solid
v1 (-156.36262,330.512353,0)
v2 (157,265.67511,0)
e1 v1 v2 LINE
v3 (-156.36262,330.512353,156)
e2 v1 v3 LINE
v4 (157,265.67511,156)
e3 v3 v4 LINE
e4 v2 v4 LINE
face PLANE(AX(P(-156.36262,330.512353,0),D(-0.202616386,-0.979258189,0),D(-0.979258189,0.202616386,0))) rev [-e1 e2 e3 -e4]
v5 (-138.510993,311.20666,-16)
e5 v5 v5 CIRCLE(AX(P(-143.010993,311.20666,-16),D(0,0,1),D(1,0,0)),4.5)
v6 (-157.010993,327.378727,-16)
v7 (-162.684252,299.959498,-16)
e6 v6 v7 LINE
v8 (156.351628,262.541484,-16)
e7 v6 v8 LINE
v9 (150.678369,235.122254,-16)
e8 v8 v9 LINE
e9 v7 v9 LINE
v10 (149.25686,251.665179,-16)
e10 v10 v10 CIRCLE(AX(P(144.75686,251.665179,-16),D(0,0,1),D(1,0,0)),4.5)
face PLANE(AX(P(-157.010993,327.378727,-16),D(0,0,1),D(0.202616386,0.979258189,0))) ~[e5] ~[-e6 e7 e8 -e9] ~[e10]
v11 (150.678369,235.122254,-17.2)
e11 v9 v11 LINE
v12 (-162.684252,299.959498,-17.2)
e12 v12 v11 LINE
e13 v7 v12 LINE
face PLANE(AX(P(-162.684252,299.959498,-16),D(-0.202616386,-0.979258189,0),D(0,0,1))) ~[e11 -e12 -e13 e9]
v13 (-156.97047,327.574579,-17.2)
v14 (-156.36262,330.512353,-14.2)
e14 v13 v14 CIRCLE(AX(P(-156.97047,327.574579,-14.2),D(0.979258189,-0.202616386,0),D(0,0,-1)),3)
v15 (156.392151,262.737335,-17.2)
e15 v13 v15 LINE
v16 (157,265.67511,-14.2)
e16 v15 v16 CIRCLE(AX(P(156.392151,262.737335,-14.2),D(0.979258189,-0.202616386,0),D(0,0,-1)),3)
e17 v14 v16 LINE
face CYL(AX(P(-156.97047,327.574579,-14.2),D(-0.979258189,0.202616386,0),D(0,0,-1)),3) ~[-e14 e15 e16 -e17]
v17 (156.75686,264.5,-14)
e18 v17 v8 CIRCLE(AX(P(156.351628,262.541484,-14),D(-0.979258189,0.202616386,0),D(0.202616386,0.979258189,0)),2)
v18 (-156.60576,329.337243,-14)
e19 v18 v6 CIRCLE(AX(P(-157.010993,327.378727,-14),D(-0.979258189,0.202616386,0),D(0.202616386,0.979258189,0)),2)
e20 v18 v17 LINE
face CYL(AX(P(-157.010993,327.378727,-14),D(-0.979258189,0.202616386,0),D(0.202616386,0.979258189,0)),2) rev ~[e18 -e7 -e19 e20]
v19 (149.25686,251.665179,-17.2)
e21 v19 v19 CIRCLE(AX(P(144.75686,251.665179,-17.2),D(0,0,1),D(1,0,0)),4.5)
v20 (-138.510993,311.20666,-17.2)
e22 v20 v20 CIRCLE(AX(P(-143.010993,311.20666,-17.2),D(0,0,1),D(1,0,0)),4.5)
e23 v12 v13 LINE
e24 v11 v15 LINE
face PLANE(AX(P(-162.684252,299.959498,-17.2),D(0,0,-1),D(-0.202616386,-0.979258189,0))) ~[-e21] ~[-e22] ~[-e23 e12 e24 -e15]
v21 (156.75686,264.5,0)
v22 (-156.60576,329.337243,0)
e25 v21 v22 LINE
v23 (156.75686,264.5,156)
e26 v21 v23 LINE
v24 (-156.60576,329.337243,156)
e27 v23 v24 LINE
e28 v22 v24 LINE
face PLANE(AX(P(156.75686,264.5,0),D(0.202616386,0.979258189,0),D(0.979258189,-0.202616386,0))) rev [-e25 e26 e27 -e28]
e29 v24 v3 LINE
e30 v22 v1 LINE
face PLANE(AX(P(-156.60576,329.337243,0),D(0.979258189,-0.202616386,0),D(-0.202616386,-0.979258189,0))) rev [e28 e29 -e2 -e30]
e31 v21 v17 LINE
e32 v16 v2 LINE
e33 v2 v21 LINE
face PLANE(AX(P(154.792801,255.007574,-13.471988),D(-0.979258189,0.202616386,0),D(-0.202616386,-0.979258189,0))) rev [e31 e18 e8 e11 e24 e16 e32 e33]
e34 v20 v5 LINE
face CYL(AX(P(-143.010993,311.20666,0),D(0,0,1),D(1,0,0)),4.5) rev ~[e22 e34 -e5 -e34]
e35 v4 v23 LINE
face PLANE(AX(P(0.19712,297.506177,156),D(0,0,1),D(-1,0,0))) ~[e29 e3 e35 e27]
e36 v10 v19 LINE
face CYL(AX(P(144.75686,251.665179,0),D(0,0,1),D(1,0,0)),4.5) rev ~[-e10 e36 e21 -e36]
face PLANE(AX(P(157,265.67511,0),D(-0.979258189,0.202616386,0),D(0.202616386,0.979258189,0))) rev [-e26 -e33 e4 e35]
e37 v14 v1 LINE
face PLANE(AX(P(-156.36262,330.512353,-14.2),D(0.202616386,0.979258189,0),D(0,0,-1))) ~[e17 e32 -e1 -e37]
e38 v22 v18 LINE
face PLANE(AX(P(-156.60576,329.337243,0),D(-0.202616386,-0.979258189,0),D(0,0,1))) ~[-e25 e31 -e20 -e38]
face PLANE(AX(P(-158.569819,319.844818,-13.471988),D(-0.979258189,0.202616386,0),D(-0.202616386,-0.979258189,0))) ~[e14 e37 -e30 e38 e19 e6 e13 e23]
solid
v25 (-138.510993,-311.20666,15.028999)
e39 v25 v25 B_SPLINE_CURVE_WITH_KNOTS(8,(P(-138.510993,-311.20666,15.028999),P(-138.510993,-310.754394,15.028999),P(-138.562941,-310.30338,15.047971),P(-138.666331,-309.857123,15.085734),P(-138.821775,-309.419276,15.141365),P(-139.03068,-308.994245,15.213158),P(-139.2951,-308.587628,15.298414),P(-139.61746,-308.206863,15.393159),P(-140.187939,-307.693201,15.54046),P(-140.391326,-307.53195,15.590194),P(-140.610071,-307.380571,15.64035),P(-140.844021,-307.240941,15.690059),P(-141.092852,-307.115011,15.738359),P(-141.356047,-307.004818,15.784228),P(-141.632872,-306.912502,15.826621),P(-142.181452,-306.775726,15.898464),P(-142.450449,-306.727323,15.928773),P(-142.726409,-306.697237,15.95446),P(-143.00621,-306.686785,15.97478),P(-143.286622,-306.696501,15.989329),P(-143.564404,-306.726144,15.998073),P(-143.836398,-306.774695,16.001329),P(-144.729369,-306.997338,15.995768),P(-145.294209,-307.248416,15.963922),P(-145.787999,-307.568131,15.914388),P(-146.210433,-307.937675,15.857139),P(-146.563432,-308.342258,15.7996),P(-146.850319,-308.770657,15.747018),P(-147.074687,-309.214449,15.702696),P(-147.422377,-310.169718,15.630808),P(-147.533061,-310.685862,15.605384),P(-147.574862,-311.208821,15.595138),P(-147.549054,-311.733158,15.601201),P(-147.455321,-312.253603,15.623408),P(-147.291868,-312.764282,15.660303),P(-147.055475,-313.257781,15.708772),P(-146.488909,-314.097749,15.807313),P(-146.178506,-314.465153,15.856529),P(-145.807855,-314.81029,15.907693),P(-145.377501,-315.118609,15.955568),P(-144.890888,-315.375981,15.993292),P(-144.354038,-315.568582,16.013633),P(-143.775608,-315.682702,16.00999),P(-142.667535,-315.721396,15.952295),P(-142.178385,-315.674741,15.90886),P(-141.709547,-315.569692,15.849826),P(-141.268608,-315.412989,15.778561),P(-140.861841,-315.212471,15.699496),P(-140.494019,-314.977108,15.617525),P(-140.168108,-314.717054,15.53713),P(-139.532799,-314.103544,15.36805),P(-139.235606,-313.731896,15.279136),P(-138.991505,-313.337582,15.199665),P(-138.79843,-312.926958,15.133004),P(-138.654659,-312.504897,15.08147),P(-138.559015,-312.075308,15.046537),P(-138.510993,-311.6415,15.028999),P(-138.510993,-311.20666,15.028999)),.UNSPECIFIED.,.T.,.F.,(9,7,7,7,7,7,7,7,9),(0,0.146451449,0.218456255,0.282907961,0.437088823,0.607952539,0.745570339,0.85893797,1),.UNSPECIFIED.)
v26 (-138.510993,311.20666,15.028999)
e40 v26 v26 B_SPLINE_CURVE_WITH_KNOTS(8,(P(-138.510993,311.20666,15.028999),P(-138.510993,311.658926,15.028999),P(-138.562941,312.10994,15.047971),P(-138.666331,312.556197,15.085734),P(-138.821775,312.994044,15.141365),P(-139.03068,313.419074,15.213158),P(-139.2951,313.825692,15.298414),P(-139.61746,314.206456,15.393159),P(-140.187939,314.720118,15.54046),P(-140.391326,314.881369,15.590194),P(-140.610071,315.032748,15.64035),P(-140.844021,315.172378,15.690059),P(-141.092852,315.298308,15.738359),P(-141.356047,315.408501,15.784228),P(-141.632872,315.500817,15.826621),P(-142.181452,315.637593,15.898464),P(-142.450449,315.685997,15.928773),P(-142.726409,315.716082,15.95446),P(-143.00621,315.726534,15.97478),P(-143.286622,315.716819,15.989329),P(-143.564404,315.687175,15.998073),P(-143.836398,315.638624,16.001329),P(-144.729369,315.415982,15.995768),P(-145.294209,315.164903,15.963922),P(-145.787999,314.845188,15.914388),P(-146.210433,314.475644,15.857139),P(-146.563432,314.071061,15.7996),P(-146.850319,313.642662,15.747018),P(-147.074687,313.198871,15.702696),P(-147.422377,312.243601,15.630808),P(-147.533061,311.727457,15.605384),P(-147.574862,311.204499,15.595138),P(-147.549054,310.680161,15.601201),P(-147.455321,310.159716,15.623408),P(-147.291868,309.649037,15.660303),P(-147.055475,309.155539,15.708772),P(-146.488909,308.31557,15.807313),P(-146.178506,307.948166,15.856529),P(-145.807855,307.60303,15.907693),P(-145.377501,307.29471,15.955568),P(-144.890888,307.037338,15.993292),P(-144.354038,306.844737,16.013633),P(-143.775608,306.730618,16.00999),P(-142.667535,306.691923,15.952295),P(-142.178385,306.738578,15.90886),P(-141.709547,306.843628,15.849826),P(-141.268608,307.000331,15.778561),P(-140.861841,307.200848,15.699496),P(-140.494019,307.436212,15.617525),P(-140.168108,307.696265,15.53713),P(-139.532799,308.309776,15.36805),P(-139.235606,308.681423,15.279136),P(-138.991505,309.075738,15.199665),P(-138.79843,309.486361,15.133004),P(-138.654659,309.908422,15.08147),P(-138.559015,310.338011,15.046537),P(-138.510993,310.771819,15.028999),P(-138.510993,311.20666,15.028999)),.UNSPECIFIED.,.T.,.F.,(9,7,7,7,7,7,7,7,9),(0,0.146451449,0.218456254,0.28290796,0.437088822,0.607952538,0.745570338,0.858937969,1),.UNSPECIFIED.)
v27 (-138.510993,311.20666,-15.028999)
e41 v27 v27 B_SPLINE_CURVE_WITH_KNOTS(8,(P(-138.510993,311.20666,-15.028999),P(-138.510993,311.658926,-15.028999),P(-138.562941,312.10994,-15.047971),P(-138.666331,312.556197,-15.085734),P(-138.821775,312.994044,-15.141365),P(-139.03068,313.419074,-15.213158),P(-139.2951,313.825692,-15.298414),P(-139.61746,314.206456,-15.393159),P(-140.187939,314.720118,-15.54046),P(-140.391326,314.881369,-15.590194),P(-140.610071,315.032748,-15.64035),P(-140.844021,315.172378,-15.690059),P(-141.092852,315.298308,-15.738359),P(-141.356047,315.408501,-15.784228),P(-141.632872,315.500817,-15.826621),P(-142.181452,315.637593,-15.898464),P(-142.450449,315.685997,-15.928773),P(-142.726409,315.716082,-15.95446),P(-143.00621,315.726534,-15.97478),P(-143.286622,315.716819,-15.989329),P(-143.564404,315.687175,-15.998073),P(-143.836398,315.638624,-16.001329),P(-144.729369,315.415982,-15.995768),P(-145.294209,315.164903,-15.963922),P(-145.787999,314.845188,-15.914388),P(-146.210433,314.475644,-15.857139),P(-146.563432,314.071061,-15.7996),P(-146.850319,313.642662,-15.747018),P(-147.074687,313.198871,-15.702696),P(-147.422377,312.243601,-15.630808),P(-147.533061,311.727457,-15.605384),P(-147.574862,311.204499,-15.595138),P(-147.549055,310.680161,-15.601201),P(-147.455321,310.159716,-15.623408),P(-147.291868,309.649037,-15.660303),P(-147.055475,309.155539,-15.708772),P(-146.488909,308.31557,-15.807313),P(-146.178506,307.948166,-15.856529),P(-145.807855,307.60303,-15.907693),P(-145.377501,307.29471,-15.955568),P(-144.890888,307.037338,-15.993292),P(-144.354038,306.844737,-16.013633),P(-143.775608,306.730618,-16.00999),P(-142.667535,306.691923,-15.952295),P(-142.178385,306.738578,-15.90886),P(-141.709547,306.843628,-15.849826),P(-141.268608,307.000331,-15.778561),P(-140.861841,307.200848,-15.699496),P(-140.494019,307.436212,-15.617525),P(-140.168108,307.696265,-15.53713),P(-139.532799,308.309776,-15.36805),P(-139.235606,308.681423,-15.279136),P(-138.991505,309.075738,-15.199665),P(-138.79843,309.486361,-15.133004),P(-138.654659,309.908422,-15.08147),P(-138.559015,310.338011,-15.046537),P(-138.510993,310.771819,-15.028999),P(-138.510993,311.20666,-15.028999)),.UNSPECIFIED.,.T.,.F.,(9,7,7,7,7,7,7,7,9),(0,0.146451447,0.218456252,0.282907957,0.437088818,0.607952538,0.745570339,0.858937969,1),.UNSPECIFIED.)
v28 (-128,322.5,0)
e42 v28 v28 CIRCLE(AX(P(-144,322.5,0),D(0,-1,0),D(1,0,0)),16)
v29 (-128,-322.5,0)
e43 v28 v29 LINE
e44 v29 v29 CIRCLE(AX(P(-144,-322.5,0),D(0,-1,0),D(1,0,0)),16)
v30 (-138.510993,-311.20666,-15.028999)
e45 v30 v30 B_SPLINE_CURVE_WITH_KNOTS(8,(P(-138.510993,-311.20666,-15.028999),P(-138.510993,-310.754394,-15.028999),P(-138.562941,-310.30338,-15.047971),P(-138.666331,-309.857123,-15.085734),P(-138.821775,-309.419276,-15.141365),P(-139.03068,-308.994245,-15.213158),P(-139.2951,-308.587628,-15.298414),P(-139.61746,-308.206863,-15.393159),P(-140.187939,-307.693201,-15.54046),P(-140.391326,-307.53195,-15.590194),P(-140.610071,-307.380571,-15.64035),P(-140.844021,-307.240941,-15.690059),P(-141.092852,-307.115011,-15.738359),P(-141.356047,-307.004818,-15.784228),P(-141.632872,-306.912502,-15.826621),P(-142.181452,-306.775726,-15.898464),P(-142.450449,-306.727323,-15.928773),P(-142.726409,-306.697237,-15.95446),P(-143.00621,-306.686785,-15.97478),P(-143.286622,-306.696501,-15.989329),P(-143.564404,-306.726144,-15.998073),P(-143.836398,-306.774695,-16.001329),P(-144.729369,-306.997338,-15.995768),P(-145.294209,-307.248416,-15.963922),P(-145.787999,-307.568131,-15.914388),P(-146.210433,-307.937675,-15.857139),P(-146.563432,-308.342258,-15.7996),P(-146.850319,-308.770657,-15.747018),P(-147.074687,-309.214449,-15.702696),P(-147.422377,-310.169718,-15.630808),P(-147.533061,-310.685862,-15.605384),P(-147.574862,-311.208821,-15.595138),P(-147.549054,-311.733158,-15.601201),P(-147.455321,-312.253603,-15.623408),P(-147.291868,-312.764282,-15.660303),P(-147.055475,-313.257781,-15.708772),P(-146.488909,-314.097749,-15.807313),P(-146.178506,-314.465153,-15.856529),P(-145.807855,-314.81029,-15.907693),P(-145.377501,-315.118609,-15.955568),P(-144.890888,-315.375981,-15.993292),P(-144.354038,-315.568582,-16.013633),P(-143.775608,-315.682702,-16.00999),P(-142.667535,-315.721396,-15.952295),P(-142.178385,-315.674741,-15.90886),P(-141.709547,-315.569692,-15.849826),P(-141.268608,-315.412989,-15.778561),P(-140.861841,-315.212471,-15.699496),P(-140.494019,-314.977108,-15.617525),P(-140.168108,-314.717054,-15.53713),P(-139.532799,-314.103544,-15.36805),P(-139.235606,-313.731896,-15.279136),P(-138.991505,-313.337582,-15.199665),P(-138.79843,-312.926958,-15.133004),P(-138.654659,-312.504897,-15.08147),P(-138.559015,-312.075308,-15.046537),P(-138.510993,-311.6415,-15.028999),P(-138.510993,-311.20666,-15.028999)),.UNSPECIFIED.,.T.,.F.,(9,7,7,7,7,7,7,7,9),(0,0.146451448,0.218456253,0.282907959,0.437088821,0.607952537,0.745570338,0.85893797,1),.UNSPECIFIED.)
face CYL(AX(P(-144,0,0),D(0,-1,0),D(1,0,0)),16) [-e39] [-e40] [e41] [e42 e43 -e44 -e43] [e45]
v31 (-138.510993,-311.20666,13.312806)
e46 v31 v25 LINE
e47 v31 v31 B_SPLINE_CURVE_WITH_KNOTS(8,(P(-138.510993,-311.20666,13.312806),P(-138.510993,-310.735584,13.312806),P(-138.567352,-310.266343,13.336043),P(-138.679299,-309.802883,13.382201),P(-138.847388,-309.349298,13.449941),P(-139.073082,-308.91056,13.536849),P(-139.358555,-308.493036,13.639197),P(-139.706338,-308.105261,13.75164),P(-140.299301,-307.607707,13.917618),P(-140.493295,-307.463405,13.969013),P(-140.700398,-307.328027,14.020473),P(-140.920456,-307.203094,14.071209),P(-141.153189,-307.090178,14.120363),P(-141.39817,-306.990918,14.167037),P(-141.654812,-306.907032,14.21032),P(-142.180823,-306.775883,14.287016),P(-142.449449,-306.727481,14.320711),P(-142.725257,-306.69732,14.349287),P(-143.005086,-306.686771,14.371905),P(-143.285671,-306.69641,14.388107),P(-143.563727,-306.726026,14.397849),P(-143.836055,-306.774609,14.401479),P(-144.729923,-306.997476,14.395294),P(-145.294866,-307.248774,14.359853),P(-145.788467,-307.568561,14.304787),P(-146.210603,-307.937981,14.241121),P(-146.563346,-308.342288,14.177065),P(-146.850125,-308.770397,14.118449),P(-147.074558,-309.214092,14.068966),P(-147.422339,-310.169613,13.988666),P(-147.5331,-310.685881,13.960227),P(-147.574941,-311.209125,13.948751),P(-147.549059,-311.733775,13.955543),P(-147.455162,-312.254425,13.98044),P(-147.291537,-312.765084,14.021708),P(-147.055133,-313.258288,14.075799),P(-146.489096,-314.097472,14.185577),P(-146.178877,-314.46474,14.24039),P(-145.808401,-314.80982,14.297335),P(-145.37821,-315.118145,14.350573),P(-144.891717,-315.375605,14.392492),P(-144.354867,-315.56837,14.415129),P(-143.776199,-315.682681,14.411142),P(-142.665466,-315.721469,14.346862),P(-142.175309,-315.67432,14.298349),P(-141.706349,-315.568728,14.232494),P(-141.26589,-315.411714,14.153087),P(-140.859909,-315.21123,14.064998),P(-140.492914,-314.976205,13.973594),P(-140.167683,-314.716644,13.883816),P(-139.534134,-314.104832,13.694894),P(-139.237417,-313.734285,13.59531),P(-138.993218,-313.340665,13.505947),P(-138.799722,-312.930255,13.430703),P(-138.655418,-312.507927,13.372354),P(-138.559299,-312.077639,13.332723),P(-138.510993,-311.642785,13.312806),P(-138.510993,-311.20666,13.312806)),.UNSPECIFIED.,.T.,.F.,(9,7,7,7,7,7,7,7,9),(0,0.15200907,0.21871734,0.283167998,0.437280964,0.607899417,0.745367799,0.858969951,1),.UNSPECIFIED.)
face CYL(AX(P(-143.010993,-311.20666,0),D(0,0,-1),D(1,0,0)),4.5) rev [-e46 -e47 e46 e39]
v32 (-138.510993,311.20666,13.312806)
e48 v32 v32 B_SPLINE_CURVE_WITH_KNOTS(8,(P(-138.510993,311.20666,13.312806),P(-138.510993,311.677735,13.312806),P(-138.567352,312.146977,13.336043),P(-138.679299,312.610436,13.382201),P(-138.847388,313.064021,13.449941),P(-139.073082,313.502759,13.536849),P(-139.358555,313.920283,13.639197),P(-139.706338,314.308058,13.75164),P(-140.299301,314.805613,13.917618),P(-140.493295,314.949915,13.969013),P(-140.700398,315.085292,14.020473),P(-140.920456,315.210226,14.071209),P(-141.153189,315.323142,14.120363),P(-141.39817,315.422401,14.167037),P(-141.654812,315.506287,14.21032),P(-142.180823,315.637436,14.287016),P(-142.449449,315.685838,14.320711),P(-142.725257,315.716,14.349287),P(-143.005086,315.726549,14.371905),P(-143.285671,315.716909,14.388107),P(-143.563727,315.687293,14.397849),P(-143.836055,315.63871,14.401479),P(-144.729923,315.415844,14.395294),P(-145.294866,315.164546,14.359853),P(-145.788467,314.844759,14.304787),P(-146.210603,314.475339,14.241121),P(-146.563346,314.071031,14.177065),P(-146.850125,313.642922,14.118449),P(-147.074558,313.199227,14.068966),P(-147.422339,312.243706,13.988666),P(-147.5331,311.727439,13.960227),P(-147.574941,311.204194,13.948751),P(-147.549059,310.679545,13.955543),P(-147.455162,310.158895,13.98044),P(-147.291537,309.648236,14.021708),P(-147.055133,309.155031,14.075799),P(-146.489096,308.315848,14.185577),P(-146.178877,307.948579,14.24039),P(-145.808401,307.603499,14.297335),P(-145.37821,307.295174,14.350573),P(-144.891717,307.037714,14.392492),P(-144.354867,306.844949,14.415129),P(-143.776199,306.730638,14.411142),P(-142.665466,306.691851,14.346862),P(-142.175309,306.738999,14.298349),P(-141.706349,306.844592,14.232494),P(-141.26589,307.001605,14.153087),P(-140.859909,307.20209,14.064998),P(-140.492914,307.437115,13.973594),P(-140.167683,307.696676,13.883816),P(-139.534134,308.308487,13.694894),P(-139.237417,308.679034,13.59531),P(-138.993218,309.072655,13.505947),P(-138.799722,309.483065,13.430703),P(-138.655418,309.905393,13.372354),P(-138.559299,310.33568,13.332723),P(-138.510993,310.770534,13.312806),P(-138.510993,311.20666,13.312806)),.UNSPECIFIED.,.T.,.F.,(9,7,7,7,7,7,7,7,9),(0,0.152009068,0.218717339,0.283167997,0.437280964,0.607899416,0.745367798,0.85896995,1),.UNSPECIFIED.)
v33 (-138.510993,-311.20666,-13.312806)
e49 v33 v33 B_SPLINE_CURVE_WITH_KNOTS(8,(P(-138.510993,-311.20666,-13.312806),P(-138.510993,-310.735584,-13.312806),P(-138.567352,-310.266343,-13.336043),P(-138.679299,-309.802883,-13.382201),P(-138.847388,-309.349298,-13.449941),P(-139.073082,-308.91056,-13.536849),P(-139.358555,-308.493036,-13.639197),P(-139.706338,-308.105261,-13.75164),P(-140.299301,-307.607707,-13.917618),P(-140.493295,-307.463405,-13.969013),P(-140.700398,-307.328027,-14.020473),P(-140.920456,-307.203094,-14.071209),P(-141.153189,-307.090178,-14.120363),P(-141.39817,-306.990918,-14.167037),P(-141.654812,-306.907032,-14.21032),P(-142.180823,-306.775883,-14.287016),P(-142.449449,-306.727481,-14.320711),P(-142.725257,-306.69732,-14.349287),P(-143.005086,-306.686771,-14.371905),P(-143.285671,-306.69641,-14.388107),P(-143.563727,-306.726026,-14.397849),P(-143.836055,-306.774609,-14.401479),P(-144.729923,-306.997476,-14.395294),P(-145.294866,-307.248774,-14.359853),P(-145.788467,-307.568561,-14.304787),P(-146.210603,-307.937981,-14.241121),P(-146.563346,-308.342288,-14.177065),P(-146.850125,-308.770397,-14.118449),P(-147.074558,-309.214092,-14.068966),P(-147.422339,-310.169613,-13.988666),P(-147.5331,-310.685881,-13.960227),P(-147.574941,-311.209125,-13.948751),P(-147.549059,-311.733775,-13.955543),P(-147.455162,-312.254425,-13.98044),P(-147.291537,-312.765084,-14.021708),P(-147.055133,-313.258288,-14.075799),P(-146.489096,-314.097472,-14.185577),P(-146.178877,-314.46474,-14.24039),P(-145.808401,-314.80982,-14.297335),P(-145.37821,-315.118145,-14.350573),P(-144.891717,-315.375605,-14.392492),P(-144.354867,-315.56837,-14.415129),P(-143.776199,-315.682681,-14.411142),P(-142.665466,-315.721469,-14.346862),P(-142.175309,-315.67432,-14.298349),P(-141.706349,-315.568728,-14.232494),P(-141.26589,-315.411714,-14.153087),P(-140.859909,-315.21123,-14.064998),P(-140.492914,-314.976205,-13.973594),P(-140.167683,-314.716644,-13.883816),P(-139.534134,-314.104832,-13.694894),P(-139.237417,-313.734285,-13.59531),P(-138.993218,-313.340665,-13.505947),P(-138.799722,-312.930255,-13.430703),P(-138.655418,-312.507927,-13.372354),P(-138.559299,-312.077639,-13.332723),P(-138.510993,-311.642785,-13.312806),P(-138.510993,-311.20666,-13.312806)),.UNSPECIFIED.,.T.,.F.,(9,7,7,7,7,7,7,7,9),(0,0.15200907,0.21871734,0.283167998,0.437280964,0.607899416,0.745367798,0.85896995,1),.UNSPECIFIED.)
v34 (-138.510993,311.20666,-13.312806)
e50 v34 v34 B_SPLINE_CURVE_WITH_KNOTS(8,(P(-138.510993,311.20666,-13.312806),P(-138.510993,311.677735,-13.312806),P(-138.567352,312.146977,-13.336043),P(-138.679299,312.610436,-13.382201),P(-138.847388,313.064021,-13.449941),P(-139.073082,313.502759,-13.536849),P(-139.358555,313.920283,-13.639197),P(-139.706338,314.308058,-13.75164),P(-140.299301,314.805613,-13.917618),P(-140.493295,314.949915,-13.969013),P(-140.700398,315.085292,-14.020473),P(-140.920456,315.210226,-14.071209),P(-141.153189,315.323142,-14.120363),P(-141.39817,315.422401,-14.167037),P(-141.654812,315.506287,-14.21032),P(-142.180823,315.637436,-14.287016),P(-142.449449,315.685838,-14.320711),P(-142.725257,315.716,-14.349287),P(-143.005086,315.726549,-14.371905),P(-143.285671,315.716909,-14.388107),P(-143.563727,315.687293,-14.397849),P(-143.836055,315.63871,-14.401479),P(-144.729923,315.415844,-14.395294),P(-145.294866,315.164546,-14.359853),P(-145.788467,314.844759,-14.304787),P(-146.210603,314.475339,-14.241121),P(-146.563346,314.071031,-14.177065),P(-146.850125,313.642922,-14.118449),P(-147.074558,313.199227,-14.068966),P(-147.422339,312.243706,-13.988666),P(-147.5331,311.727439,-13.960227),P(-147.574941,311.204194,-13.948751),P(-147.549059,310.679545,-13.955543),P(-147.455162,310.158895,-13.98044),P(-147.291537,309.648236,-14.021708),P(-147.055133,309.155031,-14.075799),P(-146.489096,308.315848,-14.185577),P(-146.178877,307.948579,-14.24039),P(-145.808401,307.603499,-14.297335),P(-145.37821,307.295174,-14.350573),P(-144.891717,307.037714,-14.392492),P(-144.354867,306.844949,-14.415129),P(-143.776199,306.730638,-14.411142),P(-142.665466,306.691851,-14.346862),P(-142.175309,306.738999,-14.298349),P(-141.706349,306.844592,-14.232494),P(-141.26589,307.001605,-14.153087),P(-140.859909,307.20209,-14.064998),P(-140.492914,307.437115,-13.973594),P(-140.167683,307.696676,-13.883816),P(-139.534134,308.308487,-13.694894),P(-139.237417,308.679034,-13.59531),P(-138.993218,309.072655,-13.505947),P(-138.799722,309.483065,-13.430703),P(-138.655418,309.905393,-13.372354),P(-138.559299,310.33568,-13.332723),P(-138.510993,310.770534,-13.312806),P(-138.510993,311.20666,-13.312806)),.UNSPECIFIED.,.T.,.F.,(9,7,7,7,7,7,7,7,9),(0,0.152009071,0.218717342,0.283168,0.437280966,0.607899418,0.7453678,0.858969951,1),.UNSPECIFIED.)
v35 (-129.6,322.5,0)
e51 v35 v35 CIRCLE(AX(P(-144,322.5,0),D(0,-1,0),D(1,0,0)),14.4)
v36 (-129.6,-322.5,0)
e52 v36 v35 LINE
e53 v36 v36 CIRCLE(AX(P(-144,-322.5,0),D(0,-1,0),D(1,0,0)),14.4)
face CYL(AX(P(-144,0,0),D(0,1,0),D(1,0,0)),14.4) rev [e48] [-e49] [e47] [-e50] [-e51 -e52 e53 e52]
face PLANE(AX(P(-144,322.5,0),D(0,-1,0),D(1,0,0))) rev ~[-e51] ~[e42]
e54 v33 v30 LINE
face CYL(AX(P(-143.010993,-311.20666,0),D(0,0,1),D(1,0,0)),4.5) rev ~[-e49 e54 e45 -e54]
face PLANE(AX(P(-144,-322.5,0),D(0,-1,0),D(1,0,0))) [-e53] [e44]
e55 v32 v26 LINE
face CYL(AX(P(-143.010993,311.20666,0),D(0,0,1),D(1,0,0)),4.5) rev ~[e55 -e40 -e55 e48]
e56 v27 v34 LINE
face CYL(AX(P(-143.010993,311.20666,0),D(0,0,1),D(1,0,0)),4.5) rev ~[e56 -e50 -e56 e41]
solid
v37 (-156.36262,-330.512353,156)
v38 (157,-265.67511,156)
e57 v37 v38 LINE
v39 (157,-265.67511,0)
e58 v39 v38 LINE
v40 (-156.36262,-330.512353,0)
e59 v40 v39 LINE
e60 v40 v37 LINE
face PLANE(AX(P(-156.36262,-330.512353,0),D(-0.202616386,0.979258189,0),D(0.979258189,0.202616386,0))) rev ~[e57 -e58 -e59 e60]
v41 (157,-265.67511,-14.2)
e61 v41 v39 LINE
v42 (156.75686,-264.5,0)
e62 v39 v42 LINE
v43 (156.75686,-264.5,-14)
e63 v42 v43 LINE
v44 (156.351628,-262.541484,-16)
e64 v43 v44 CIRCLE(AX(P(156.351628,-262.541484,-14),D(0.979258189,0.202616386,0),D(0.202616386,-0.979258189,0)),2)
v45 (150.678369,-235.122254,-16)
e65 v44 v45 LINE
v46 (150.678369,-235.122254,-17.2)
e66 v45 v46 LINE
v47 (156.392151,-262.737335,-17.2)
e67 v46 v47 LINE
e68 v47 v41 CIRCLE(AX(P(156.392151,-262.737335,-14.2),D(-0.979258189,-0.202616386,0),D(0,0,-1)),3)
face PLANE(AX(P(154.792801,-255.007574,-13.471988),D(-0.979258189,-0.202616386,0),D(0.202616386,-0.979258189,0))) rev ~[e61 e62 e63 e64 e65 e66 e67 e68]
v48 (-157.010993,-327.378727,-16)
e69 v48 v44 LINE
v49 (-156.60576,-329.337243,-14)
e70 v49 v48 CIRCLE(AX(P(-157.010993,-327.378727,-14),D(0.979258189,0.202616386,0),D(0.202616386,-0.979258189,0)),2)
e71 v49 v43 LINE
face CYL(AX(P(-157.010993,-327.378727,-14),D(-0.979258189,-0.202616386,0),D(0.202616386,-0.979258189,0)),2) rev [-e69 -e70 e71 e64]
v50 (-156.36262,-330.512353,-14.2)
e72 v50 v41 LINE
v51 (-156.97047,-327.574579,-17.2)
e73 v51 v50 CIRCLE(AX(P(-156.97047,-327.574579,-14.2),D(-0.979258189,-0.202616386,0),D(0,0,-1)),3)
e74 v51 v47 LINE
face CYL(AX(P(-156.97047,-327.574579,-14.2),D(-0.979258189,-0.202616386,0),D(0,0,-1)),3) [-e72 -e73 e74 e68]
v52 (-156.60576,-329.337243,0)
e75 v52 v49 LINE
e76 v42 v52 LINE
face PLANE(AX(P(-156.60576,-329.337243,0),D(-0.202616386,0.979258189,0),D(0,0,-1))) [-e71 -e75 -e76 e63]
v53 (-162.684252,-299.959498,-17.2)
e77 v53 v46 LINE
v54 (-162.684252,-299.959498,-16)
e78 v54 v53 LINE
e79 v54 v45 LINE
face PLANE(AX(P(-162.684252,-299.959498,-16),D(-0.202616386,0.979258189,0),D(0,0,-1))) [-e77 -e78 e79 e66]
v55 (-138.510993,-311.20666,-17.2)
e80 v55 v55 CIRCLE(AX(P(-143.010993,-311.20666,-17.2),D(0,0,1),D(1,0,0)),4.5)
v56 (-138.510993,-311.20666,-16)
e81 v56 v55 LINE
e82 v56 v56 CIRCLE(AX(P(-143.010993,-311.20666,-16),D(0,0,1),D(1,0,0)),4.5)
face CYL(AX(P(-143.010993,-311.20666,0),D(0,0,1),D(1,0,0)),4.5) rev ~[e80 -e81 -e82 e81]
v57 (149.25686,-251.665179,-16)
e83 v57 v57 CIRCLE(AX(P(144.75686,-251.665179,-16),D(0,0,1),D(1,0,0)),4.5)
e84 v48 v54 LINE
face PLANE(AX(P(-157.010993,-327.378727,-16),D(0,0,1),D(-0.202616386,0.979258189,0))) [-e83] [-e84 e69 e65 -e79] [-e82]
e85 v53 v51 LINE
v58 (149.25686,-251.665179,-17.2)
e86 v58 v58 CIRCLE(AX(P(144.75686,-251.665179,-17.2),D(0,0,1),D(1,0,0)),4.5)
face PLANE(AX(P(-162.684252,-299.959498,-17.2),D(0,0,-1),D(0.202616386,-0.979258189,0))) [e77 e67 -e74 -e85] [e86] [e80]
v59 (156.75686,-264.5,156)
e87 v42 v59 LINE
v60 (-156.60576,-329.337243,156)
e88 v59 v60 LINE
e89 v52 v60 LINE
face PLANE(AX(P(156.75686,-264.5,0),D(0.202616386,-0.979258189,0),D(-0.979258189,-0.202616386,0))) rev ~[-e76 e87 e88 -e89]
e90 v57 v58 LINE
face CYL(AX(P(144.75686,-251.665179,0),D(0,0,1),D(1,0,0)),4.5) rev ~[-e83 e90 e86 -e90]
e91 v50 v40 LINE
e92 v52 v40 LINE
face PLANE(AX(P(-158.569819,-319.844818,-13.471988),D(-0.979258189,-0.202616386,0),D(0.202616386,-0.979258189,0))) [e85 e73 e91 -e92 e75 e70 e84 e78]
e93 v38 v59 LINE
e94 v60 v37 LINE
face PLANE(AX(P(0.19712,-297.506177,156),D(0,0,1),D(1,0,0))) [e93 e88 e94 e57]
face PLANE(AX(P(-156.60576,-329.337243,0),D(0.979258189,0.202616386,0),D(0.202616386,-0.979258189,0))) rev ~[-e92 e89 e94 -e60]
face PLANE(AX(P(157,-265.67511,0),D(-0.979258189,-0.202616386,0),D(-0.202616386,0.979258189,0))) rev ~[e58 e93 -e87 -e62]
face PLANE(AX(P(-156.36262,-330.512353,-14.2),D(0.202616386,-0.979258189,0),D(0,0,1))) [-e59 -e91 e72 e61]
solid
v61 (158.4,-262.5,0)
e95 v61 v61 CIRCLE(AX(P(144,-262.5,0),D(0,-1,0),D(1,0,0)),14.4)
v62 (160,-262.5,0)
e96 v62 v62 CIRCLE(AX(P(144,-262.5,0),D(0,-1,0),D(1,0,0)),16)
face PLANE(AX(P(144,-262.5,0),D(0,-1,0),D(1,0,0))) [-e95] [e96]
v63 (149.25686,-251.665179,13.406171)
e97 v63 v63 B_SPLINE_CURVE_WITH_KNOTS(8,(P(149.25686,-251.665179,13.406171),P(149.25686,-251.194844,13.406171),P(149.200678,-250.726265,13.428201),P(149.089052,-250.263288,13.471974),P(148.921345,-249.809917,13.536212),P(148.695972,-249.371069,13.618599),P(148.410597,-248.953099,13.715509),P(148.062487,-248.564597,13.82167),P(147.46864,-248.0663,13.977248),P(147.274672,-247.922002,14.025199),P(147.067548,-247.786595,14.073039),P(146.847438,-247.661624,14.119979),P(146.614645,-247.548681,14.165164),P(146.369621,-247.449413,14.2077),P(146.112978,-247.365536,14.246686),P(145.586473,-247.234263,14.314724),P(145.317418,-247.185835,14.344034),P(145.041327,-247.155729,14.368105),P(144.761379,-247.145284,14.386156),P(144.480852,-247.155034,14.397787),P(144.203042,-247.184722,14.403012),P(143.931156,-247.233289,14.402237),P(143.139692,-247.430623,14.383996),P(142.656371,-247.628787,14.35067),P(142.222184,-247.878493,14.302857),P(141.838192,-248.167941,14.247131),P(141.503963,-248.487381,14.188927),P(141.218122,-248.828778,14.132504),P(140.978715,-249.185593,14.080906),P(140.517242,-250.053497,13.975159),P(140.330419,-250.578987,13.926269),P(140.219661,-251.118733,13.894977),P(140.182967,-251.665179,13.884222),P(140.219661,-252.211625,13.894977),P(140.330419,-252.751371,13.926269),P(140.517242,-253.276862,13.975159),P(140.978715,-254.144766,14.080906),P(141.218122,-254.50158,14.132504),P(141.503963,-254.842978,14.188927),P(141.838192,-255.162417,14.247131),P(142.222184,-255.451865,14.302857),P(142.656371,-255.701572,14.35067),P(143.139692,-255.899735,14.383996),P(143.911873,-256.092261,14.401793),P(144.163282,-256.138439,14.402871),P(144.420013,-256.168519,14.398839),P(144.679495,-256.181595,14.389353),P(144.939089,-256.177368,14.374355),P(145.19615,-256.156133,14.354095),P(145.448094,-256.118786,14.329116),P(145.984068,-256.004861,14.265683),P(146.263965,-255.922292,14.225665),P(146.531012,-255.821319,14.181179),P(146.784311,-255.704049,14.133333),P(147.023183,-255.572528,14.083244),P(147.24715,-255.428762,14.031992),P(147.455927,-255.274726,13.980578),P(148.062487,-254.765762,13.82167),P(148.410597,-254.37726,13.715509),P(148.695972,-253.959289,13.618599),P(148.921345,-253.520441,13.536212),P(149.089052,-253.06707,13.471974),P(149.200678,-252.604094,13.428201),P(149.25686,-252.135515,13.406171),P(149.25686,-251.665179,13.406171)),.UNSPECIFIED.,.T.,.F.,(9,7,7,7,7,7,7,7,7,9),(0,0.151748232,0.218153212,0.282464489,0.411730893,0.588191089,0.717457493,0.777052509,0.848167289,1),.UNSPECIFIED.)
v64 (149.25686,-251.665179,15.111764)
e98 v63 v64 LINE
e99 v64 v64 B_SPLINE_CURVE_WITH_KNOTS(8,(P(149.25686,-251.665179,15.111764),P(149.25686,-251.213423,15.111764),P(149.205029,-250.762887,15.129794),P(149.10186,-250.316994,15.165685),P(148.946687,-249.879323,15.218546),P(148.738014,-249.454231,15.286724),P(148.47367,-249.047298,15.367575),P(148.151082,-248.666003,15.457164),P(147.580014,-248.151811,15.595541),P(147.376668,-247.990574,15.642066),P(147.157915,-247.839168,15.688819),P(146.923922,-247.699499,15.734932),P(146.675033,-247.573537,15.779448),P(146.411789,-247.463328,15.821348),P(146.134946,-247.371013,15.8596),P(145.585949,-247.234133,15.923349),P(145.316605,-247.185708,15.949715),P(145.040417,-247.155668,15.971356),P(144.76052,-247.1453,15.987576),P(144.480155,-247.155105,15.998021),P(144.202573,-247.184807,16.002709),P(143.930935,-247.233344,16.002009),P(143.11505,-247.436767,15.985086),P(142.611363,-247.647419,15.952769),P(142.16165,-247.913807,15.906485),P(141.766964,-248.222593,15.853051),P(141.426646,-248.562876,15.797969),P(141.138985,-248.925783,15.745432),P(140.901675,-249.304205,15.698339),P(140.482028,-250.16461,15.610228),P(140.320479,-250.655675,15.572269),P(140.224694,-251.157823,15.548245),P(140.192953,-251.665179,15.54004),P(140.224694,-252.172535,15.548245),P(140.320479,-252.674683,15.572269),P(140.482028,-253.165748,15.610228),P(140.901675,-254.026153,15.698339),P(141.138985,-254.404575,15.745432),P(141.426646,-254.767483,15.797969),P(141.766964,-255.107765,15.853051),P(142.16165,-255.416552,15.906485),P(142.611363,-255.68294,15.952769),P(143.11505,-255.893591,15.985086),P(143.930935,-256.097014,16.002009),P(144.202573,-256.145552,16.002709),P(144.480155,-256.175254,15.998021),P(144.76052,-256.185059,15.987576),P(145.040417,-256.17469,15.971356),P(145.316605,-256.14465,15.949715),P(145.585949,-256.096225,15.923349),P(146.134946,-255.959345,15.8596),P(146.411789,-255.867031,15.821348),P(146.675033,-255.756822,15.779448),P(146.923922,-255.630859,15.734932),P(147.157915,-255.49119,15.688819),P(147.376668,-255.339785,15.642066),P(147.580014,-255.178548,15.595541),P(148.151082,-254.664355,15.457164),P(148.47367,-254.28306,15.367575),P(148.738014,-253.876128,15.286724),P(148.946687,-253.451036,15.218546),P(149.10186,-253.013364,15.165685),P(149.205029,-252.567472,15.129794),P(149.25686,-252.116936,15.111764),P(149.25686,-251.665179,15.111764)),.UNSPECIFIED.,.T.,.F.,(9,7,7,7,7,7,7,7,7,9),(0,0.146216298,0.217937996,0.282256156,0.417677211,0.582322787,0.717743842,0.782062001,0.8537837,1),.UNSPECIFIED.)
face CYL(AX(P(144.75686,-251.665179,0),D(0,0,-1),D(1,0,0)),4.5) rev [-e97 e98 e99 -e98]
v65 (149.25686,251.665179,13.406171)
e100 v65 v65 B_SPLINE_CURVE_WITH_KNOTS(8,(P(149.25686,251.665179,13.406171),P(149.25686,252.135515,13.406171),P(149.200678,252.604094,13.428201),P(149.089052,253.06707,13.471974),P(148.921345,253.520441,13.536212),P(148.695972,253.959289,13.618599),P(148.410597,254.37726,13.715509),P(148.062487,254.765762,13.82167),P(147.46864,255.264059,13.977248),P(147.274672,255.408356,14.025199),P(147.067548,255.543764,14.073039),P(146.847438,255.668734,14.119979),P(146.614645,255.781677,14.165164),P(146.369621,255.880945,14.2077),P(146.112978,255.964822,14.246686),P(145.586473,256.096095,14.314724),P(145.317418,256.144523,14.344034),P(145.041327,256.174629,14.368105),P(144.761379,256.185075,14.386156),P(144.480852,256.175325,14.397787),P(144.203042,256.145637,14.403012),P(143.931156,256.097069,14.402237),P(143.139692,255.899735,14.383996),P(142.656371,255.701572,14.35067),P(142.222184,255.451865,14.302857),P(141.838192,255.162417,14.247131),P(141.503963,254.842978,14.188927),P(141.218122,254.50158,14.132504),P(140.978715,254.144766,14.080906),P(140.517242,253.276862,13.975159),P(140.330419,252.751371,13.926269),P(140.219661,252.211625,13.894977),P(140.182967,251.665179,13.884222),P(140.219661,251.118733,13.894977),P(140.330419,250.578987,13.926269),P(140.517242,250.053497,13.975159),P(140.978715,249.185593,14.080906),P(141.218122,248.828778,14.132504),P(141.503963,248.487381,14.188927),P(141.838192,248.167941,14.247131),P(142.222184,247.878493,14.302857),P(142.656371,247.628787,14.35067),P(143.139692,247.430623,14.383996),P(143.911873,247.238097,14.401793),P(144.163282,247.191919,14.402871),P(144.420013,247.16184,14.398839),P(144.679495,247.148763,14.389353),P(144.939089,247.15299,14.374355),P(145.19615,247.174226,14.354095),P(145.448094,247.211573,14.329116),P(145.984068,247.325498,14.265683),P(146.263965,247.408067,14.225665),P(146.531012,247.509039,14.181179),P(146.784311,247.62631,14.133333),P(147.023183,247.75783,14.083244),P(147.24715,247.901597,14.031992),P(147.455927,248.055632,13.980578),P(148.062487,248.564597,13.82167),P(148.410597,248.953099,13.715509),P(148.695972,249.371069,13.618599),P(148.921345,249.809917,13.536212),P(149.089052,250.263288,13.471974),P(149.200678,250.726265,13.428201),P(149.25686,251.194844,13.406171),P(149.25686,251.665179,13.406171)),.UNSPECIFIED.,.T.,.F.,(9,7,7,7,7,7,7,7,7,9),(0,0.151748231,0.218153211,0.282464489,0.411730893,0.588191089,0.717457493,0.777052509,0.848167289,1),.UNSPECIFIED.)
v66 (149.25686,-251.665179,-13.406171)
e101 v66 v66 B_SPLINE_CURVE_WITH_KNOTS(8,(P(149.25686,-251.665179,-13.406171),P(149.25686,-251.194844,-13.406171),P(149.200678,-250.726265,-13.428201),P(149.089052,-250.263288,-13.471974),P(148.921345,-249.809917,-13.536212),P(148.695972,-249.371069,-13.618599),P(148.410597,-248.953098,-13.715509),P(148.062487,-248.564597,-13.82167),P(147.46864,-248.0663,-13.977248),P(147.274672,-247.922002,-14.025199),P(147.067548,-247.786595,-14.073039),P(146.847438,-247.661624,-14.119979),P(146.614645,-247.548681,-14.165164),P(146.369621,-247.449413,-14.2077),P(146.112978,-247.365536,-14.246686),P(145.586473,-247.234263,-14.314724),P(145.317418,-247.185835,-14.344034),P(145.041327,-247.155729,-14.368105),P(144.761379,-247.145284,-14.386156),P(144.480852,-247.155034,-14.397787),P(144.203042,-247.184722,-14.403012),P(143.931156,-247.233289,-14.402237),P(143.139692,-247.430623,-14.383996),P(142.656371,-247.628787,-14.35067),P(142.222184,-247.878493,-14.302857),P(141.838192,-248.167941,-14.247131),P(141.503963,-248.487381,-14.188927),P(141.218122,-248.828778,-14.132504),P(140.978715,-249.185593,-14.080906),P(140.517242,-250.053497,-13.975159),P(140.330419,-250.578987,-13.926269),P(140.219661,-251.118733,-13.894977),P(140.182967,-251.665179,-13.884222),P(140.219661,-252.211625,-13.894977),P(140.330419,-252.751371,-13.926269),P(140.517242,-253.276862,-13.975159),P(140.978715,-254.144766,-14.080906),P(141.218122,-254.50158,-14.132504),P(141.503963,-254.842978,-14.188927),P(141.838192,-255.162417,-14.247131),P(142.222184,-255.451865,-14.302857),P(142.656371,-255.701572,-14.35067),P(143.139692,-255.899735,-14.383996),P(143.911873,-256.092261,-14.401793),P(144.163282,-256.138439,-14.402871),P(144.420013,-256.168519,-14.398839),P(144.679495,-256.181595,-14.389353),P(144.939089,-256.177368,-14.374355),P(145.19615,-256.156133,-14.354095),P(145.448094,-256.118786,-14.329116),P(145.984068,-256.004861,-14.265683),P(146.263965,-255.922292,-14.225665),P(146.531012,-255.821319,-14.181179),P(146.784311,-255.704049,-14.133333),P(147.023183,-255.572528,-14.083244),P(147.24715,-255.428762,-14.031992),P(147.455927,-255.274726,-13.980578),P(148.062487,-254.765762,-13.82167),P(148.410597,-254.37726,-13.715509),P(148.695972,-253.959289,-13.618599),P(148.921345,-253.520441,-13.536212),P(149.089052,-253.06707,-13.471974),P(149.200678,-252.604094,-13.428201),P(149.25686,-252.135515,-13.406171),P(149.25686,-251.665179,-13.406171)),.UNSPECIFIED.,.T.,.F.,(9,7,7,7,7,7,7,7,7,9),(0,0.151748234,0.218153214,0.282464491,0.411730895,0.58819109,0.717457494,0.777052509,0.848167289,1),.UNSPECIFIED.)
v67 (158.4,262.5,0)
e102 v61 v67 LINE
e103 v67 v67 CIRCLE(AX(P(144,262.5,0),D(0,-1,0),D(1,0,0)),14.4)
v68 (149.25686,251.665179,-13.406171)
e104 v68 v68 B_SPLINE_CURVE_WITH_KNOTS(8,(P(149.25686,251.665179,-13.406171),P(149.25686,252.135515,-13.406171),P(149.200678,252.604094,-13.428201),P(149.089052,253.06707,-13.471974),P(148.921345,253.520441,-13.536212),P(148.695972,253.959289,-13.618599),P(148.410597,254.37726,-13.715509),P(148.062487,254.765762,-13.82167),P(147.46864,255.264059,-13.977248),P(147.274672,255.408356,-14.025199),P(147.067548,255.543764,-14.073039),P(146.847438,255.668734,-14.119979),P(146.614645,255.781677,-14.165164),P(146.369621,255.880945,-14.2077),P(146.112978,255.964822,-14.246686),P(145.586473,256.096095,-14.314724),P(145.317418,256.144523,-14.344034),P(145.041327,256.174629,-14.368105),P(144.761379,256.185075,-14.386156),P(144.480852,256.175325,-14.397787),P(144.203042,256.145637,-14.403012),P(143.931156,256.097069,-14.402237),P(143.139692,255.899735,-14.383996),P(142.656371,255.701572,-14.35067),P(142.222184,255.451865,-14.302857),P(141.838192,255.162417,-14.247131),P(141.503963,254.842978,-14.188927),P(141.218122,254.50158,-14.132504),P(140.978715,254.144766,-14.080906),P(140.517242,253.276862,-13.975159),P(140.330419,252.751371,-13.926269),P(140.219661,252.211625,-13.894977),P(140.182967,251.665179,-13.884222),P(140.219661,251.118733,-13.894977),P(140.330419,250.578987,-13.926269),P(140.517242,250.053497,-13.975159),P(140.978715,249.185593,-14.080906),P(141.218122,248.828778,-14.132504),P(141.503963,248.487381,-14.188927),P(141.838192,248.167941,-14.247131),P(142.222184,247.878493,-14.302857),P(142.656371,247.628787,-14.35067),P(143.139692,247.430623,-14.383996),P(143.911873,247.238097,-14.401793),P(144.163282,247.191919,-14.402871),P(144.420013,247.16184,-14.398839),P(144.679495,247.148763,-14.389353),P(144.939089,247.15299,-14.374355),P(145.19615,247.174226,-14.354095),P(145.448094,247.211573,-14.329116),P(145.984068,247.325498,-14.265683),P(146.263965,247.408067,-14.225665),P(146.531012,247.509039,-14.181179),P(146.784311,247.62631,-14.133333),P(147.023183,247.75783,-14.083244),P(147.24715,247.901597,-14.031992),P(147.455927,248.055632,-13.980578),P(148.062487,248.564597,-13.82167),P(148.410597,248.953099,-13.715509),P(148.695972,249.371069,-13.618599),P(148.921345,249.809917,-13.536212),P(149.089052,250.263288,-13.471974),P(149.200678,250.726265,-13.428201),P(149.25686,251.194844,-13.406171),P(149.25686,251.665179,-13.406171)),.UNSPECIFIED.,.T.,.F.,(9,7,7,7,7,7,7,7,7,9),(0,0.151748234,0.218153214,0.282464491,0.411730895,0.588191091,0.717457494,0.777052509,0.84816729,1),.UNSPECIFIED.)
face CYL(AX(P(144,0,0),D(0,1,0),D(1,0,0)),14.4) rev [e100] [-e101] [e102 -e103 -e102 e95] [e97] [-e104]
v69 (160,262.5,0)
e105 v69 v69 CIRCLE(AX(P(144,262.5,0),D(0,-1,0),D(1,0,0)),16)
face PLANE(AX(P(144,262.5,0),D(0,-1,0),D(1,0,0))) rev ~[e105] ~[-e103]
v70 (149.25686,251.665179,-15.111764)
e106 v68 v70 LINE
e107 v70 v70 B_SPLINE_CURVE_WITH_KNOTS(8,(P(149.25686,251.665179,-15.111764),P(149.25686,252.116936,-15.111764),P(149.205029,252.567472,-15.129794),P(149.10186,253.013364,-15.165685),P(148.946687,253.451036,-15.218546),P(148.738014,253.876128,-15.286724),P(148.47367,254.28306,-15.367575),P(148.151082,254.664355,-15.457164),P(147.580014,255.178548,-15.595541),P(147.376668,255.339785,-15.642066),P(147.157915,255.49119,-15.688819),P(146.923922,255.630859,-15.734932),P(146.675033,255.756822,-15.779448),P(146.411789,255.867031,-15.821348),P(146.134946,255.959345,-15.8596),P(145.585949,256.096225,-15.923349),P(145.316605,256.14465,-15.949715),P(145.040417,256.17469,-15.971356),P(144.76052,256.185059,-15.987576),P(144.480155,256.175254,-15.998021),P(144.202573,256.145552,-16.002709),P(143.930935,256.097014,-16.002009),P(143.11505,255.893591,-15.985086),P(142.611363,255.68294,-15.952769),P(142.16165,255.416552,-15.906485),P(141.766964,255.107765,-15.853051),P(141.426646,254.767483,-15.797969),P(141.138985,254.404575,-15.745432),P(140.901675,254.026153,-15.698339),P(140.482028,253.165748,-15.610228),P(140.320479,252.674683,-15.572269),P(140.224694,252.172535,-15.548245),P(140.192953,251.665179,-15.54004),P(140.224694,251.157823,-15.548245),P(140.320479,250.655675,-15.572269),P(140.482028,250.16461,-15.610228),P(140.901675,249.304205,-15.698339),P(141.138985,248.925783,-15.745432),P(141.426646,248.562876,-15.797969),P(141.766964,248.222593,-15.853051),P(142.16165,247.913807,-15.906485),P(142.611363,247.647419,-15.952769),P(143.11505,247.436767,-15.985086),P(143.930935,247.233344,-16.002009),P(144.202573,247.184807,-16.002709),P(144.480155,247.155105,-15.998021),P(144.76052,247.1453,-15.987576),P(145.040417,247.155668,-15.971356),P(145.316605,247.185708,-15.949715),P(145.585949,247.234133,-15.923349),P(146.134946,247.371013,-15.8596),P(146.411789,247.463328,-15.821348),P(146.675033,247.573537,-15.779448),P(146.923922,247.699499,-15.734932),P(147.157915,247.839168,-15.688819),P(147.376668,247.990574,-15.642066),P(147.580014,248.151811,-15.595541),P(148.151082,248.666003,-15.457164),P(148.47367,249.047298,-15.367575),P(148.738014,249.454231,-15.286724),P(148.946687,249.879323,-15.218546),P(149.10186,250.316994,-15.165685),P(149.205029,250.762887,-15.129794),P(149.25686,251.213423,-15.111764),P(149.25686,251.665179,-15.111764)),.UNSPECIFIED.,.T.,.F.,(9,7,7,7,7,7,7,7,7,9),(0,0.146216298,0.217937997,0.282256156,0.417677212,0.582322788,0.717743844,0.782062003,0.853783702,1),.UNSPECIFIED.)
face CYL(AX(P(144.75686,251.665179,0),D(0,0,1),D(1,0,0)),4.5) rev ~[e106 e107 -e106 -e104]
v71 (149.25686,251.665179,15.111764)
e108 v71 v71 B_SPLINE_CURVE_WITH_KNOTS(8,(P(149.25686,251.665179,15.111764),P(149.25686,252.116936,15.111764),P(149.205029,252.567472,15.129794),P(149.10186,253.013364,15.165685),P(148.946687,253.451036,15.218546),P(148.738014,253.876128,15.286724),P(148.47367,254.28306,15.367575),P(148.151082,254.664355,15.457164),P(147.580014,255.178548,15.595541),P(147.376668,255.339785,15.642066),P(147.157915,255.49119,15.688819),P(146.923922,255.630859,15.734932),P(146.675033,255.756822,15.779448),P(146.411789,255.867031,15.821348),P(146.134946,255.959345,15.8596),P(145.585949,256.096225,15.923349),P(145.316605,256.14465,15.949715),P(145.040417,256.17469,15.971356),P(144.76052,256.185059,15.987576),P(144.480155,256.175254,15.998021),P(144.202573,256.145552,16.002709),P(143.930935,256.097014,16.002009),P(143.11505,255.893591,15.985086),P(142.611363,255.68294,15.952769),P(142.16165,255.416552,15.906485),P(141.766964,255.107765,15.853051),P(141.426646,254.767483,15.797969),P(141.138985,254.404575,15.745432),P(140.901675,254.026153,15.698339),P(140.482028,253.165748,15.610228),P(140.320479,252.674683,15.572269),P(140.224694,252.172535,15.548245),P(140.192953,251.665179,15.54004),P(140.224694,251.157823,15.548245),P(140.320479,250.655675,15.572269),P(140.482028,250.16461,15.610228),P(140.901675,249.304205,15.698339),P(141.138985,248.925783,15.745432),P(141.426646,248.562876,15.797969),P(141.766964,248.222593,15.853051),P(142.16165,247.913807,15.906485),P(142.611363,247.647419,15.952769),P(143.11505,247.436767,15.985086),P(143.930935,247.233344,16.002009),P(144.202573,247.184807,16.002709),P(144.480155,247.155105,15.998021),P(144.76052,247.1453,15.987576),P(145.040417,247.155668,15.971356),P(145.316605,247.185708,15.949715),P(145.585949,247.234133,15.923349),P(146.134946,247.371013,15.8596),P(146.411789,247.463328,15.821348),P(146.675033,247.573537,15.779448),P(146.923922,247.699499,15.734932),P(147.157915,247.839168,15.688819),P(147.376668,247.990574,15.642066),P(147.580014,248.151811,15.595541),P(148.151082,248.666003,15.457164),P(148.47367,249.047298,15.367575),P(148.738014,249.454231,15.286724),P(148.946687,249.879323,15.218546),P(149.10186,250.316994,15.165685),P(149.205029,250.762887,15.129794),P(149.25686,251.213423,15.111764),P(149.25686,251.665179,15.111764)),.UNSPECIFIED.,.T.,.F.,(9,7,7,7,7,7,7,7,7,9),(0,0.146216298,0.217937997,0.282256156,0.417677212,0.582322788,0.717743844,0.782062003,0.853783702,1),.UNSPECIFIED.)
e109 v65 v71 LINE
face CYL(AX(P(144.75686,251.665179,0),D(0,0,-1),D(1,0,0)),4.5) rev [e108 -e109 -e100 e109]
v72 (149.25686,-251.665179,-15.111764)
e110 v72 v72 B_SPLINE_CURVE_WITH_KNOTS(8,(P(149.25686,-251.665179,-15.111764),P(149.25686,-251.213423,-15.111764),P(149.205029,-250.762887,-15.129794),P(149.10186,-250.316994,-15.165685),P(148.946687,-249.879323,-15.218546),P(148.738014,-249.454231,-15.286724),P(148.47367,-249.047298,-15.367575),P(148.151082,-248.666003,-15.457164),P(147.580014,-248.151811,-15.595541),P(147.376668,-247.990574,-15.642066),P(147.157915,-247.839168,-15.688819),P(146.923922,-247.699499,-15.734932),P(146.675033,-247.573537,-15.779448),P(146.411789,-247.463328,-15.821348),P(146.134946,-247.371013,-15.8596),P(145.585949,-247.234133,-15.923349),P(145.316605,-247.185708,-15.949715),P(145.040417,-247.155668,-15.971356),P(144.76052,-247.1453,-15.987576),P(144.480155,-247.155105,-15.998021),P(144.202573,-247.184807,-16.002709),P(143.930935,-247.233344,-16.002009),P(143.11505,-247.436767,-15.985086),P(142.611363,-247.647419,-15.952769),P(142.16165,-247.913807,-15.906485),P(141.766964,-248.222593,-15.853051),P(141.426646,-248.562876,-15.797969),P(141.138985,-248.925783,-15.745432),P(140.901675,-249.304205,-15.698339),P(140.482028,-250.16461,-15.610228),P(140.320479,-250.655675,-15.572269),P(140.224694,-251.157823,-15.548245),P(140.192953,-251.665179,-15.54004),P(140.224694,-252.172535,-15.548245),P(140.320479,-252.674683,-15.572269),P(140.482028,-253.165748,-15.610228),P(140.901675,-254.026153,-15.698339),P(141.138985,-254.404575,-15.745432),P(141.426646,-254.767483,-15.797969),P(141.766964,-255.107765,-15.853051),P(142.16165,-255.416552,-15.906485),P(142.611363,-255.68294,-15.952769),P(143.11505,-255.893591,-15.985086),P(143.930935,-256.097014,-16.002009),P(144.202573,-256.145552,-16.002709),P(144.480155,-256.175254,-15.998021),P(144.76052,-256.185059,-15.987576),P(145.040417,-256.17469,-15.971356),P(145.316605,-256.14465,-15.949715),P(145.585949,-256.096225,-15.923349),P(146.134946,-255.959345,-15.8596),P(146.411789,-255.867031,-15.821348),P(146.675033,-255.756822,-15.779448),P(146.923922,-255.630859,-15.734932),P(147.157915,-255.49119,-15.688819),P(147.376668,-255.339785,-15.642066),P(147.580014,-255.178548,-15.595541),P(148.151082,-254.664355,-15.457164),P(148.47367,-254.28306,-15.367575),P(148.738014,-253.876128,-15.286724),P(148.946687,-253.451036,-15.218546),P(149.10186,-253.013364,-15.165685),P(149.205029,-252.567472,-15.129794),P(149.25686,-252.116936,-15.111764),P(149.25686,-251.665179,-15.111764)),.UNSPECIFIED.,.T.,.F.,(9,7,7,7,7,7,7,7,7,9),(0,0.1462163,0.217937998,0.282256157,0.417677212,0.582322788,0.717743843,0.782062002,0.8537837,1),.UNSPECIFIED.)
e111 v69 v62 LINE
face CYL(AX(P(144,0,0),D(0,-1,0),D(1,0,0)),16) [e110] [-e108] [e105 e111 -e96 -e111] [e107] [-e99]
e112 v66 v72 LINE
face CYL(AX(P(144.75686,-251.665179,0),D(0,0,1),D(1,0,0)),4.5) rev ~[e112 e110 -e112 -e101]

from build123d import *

# Parameters (mm, degrees)
F0_R      = 16
F0_R_2    = 14.4
F1_DEPTH  = 322.5
F2_R      = 16
F2_R_2    = 14.4
F3_DEPTH  = 262.5
F5_DEPTH  = 156
F7_DEPTH  = 320
F9_R      = 4.5
F10_DEPTH = 18


with BuildPart() as f1:
    # F0 (on Front) → F1 (new body, symmetric)
    with BuildSketch(Plane.XZ):
        with Locations((-144, 0)):
            Circle(F0_R)
        with Locations((-144, 0)):
            Circle(F0_R_2, mode=Mode.SUBTRACT)
    extrude(amount=F1_DEPTH, both=True)


with BuildPart() as f3:
    # F2 (on Front) → F3 (new body, symmetric)
    with BuildSketch(Plane.XZ):
        with Locations((144, 0)):
            Circle(F2_R)
        with Locations((144, 0)):
            Circle(F2_R_2, mode=Mode.SUBTRACT)
    extrude(amount=F3_DEPTH, both=True)


with BuildPart() as f5:
    # F4 (on Top) → F5 (new body)
    with BuildSketch(Plane.XY):
        Polygon((156.7568603372, -264.5), (-156.6057600682, -329.3372434071), (-156.3626204054, -330.5123532336), (157, -265.6751098265), align=None)
    extrude(amount=F5_DEPTH)

    # F6 (on face) → F7 (join)
    with BuildSketch(Plane(origin=(-215.5216002673, -44.5931503826, 0), x_dir=(0.2026163856, -0.9792581888, 0), z_dir=(-0.9792581888, -0.2026163856, 0))):
        with BuildLine():
            Line((291.9752993958, 0), (290.7752993958, 0))
            Line((290.7752993958, 0), (290.7752993958, -14))
            ThreePointArc((290.7752993958, -14), (290.1895129582, -15.4142135624), (288.7752993958, -16))
            Line((288.7752993958, -16), (260.7752993958, -16))
            Line((260.7752993958, -16), (260.7752993958, -17.2))
            Line((260.7752993958, -17.2), (288.9752993958, -17.2))
            ThreePointArc((288.9752993958, -17.2), (291.0966197394, -16.3213203436), (291.9752993958, -14.2))
            Line((291.9752993958, -14.2), (291.9752993958, 0))
        make_face()
    extrude(amount=-F7_DEPTH)


with BuildPart() as f8_1:
    # F8: instance of F5
    add(f5.part.mirror(Plane.XZ))


with BuildPart() as f10_tool:
    # F9 (on Top) → F10 (new body, symmetric)
    with BuildSketch(Plane.XY):
        with Locations((-143.0109928395, -311.2066596619)):
            Circle(F9_R)
        with Locations((144.7568603372, -251.6651791975)):
            Circle(F9_R)
        with Locations((144.7568603372, 251.6651791975)):
            Circle(F9_R)
        with Locations((-143.0109928395, 311.2066596619)):
            Circle(F9_R)
    extrude(amount=F10_DEPTH, both=True)


with BuildPart() as f1_1:
    add(f1.part)

    # F10: cut by f10_tool
    add(f10_tool.part, mode=Mode.SUBTRACT)


with BuildPart() as f3_1:
    add(f3.part)

    # F10: cut by f10_tool
    add(f10_tool.part, mode=Mode.SUBTRACT)


with BuildPart() as f5_1:
    add(f5.part)

    # F10: cut by f10_tool
    add(f10_tool.part, mode=Mode.SUBTRACT)


with BuildPart() as f8_1_1:
    add(f8_1.part)

    # F10: cut by f10_tool
    add(f10_tool.part, mode=Mode.SUBTRACT)


solid = Compound([f1_1.part, f3_1.part, f5_1.part, f8_1_1.part])
